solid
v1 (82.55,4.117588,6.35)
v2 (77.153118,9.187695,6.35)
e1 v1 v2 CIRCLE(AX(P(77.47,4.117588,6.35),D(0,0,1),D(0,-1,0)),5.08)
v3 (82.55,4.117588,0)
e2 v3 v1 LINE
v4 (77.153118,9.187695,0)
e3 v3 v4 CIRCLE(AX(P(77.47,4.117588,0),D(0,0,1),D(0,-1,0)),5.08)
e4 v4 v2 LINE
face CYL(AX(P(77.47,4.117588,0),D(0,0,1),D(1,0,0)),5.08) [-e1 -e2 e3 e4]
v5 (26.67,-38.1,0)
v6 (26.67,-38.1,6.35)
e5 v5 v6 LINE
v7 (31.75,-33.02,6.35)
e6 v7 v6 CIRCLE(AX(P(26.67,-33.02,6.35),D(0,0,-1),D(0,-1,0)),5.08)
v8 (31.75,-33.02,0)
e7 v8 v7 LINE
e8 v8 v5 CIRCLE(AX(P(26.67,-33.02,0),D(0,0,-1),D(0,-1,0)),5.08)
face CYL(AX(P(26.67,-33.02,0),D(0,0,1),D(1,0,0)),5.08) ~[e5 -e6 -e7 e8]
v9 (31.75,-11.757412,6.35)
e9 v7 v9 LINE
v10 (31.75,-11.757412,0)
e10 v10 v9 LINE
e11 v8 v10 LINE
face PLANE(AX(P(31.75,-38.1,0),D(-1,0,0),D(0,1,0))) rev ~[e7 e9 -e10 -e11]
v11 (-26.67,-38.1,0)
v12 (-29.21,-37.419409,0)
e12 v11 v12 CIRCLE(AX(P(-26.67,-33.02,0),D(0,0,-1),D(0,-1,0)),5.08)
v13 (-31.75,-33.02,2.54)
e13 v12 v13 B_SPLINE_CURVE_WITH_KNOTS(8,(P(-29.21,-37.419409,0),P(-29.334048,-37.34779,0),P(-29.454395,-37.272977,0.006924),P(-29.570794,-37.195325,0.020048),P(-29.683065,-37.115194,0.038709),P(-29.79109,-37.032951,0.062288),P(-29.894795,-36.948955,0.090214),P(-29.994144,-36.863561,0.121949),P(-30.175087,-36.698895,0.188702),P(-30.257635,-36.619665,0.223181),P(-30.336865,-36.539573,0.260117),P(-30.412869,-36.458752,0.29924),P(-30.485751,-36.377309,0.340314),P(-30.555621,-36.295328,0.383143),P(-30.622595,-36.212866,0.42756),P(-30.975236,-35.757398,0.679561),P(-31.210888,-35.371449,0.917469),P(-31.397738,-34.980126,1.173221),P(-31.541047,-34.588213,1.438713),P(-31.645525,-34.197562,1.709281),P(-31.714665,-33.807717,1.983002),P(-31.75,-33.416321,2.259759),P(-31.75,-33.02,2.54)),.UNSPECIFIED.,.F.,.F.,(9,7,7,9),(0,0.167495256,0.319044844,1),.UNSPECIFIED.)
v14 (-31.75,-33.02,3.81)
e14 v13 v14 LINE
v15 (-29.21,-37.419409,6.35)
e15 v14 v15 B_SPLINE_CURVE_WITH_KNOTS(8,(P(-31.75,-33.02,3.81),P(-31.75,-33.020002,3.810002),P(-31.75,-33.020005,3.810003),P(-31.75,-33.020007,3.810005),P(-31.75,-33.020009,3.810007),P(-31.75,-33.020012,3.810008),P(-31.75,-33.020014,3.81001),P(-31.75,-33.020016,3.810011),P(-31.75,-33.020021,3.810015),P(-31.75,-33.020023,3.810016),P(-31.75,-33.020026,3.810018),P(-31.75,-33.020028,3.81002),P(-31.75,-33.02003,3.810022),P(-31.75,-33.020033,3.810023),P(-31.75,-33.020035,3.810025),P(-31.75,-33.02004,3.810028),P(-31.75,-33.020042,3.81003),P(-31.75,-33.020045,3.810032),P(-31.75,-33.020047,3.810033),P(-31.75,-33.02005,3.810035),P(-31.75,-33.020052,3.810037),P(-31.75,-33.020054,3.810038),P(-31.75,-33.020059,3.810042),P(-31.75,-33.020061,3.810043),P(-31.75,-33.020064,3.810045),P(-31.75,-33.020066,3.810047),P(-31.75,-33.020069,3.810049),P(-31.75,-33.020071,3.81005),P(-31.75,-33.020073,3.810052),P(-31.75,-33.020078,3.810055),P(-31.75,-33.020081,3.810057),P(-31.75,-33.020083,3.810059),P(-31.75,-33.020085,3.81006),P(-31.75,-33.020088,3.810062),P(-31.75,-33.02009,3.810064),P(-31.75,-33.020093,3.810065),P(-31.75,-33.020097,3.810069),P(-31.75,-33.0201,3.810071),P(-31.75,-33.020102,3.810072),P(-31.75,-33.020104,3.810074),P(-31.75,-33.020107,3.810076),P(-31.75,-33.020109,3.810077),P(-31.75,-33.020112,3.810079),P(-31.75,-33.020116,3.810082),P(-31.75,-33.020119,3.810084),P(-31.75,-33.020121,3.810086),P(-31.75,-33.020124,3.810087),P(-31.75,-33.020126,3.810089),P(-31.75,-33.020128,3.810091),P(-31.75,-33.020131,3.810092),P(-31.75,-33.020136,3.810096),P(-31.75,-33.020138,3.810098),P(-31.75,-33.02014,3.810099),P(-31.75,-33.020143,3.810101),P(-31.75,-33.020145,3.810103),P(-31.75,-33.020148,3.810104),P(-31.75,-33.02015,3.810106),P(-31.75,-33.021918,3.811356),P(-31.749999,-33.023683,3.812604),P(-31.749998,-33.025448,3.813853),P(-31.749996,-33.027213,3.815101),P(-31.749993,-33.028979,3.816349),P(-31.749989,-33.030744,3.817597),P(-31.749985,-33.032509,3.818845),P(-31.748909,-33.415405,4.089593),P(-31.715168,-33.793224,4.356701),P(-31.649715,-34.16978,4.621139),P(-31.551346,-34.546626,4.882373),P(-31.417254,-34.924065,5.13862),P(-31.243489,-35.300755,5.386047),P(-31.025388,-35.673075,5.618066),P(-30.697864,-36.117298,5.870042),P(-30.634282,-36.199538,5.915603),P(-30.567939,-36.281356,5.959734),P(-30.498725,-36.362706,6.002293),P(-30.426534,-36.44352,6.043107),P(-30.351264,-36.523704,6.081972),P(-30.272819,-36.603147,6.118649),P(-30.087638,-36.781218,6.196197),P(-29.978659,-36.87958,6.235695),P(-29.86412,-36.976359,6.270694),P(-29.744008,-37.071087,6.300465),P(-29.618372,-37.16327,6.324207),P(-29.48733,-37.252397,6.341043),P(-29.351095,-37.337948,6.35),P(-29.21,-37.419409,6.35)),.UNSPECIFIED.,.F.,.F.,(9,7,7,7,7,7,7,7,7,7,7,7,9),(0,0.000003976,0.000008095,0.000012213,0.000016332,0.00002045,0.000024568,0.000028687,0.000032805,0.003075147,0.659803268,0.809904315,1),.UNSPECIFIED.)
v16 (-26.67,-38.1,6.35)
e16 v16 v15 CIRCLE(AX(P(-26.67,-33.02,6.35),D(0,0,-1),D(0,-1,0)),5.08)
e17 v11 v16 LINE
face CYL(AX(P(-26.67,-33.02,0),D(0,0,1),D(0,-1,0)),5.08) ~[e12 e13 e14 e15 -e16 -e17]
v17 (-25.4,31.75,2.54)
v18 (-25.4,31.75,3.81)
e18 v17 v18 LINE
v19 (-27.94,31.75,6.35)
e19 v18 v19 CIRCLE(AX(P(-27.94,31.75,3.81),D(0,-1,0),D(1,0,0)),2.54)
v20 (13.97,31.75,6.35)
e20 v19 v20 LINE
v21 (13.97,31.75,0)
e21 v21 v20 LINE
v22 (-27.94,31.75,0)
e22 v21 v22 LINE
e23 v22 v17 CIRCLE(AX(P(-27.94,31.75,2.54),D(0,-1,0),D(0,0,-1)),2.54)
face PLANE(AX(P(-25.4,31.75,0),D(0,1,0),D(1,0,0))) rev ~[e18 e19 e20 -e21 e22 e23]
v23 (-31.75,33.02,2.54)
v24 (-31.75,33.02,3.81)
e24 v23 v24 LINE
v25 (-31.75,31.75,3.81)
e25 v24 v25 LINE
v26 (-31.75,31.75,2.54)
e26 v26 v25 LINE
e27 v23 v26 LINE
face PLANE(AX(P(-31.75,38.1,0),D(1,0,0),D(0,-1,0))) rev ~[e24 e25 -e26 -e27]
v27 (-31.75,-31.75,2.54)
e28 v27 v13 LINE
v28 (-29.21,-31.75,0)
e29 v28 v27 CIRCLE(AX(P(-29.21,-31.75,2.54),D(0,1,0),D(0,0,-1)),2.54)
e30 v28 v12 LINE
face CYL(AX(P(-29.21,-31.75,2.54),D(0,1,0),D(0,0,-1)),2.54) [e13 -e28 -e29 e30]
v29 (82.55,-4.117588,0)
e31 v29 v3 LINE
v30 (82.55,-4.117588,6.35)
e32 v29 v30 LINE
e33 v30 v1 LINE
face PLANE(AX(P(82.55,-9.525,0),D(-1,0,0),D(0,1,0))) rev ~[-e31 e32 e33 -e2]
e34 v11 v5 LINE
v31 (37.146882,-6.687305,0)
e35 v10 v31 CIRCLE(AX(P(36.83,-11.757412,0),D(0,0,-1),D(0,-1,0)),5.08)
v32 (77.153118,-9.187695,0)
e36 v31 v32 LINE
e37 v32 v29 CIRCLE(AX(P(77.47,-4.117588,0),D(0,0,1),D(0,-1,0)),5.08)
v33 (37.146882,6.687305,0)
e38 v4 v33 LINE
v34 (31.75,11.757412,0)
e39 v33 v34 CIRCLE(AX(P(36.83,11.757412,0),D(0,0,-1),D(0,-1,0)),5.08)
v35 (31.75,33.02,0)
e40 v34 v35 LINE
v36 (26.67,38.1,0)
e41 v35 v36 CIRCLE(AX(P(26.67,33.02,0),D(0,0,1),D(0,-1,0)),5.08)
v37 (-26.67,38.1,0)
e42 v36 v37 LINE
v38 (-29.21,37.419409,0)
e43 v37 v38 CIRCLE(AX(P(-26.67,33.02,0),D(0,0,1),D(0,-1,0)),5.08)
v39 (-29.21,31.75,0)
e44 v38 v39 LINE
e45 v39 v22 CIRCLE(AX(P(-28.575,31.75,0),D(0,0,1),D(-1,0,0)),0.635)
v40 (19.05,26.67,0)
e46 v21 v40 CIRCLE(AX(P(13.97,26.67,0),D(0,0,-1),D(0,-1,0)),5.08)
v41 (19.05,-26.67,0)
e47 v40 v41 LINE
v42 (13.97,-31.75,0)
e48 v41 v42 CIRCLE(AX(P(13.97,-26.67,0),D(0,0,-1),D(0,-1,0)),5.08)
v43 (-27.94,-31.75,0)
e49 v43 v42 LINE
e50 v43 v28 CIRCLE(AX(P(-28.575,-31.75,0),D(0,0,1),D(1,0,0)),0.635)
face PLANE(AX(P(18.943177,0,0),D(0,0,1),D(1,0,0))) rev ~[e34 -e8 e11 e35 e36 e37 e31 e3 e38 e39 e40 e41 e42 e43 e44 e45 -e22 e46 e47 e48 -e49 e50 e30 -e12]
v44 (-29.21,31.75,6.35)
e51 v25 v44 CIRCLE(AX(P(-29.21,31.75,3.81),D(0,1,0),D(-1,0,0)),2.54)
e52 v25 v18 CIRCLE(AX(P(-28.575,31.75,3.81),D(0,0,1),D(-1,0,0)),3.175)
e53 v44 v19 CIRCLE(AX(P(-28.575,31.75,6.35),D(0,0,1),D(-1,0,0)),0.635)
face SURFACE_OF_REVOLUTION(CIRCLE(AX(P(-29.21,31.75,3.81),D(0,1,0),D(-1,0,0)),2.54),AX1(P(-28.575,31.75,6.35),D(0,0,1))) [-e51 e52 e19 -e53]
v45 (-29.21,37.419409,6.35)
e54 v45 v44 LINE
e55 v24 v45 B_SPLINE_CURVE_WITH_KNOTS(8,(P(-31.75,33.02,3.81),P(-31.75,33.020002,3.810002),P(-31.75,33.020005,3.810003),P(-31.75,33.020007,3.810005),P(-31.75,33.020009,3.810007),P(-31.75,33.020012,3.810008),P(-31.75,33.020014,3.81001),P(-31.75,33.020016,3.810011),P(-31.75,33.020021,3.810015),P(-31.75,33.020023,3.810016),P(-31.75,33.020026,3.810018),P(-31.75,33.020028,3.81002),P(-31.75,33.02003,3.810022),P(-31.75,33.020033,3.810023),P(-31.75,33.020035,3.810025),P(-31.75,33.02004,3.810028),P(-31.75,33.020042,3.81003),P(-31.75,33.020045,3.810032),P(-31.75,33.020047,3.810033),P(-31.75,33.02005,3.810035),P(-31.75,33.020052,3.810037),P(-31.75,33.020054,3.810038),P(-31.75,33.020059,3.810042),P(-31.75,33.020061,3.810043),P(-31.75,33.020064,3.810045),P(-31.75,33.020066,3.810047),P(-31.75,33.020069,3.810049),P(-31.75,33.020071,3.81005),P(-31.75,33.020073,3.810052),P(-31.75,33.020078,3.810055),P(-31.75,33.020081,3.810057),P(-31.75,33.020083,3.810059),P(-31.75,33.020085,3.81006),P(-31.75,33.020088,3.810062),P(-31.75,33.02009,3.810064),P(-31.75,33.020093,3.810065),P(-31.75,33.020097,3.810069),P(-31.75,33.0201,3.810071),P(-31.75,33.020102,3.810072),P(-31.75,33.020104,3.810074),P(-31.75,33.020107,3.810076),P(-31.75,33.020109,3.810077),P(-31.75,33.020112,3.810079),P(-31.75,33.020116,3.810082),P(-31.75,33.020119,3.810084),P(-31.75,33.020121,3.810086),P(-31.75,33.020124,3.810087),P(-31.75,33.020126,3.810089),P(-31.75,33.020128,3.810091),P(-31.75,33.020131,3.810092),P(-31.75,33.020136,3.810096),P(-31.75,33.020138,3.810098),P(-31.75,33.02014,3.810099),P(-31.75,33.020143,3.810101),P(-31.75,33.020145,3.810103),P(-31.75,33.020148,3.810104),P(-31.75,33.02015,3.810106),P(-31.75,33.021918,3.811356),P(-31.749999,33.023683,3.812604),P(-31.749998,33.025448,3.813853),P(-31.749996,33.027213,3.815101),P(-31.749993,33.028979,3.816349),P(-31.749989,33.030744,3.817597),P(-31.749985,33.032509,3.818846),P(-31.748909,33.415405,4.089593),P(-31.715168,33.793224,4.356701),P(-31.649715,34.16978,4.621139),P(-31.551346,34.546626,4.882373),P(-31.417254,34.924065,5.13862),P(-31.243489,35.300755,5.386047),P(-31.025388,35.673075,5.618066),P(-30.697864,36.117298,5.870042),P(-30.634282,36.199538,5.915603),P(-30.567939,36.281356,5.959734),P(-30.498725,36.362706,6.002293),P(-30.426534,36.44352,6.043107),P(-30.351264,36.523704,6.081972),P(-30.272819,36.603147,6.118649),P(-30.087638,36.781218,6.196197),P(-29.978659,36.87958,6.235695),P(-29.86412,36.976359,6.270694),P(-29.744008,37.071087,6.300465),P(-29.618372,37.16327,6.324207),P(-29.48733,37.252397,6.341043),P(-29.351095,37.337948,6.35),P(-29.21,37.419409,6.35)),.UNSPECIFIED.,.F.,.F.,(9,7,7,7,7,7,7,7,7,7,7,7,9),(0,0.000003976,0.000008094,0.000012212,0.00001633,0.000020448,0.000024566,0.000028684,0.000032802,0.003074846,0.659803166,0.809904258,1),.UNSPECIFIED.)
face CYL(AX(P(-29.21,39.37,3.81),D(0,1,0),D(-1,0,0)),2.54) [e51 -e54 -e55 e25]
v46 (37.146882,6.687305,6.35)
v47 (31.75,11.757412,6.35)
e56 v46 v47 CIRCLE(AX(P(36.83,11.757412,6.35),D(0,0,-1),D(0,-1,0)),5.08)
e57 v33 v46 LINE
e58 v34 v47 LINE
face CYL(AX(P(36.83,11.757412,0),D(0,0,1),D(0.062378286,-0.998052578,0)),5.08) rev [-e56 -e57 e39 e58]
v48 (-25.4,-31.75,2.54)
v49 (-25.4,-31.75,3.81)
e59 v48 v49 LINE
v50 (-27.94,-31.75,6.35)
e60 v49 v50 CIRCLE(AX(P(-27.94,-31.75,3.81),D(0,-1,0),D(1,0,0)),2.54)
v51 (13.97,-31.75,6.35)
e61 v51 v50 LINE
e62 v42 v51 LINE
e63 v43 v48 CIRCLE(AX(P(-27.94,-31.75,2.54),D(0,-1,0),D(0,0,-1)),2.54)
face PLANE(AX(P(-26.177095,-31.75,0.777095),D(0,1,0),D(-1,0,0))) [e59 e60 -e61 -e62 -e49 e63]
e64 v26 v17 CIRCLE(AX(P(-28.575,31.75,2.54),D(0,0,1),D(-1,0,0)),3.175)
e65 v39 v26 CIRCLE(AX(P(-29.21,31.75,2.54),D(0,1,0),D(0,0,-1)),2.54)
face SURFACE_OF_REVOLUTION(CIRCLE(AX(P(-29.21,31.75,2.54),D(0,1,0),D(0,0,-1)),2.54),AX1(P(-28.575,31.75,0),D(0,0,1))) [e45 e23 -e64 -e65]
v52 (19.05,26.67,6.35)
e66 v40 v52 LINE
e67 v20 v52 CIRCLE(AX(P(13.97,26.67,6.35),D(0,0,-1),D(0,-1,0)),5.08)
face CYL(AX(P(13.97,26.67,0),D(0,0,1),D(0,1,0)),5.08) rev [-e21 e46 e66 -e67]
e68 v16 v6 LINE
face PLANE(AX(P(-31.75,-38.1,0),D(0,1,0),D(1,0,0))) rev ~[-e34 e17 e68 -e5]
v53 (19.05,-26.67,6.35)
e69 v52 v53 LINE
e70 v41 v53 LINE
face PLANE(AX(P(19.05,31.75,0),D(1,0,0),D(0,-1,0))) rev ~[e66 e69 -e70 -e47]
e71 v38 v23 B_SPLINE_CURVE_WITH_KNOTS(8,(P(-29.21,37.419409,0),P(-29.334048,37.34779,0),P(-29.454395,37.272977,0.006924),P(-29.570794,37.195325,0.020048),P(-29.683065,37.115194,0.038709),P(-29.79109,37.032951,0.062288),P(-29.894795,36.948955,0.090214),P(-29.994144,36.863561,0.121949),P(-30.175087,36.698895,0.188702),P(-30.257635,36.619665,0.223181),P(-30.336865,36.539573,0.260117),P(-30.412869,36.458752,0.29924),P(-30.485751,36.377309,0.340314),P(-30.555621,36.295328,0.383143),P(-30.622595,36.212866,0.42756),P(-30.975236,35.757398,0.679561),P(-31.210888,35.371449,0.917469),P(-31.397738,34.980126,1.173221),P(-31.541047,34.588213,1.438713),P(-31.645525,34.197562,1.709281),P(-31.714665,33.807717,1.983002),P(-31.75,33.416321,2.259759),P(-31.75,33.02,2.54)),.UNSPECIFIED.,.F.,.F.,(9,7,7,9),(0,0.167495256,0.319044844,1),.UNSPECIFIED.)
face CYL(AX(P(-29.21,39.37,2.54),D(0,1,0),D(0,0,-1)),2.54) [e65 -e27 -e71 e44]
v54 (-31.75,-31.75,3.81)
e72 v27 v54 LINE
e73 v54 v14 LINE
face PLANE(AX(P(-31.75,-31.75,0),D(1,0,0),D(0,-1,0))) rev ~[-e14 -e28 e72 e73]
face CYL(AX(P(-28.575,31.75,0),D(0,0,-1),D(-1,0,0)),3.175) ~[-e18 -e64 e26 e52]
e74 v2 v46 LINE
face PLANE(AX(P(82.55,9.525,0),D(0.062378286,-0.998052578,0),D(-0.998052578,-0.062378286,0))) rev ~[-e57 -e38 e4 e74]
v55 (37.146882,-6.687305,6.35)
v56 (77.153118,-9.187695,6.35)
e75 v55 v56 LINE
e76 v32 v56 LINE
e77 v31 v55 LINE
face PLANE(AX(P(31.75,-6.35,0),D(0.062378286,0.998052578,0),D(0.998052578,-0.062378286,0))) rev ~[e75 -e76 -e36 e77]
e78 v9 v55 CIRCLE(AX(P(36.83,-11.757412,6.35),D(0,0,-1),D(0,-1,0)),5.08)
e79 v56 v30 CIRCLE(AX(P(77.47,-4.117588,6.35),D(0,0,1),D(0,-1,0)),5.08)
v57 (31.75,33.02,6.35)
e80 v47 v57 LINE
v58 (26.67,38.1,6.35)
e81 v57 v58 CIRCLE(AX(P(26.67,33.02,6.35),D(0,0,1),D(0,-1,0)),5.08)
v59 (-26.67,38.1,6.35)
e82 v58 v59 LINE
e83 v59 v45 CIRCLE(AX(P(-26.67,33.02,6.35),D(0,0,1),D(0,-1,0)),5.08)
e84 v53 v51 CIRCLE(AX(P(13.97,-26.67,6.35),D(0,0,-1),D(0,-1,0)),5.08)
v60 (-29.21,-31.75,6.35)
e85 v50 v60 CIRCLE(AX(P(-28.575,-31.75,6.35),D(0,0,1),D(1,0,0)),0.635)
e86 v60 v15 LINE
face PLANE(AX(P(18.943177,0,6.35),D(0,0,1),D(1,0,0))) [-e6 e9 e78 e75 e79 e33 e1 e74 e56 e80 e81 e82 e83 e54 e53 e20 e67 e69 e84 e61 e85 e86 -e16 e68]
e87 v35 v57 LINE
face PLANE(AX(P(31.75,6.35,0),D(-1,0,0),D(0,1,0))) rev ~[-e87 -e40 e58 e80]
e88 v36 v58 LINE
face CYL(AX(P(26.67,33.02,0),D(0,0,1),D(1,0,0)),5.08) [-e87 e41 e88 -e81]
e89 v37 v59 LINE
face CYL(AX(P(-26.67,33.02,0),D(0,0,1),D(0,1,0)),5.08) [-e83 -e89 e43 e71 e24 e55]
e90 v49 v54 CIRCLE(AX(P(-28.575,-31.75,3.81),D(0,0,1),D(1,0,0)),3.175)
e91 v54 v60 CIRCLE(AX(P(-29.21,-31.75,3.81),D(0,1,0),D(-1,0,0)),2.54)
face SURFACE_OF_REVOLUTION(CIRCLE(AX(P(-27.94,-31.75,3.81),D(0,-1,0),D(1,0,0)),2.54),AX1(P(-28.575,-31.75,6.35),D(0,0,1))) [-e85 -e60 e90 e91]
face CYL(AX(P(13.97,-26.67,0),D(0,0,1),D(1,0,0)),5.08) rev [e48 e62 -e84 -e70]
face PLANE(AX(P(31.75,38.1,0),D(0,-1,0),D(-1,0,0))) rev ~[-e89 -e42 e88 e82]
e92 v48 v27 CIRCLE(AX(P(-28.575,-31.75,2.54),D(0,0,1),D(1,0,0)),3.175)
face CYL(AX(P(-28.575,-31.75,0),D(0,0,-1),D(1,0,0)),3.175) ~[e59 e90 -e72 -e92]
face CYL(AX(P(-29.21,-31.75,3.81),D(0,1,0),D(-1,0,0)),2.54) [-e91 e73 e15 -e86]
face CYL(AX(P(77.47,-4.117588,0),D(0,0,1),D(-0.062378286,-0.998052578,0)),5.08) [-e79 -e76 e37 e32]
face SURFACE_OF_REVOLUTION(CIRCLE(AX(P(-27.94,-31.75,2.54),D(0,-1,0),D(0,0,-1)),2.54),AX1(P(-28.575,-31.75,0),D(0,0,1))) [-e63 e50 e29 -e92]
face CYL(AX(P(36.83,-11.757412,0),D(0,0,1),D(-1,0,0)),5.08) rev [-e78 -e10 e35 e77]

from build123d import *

# Parameters (mm, degrees)
F1_DEPTH     = 6.35
F2_F1_R      = 5.08
F2_F2_R      = 5.08
F3_T1_DEPTH  = 7.62
F3_T3_DEPTH  = 7.62
F3_T6_ANGLE  = 180
F3_T8_ANGLE  = 180
F3_T10_ANGLE = 180
F3_T12_ANGLE = 180


# Not quite as in the source:
# - a fillet or chamfer that OpenCascade refuses, or shapes differently, is made with other operations: its cross-section is extruded or revolved along the edge and cut away or added


with BuildPart() as f1:
    # F0 (on Top) → F1 (new body)
    with BuildSketch(Plane.XY):
        with BuildLine():
            Line((-31.75, -38.1), (31.75, -38.1))
            Line((31.75, -38.1), (31.75, -6.35))
            Line((31.75, -6.35), (82.55, -9.525))
            Line((82.55, -9.525), (82.55, 9.525))
            Line((82.55, 9.525), (31.75, 6.35))
            Line((31.75, 6.35), (31.75, 38.1))
            Line((31.75, 38.1), (-31.75, 38.1))
            Line((-31.75, 38.1), (-31.75, 31.75))
            ThreePointArc((-31.75, 31.75), (-28.575, 28.575), (-25.4, 31.75))
            Line((-25.4, 31.75), (19.05, 31.75))
            Line((19.05, 31.75), (19.05, -31.75))
            Line((19.05, -31.75), (-25.4, -31.75))
            ThreePointArc((-25.4, -31.75), (-28.575, -28.575), (-31.75, -31.75))
            Line((-31.75, -31.75), (-31.75, -38.1))
        make_face()
    extrude(amount=F1_DEPTH)

    # F2: fillet of radius 5.08 on 10 edges, made by hand

    # F2_f1
    f2_f1_edges = [f1.edges().sort_by_distance(p)[0] for p in [
        (19.05, -31.75, 3.175),
        (31.75, 6.35, 3.175),
        (31.75, -6.35, 3.175),
        (19.05, 31.75, 3.175),
    ]]
    fillet(f2_f1_edges, radius=F2_F1_R)

    # F2_f2
    f2_f2_edges = [f1.edges().sort_by_distance(p)[0] for p in [
        (31.75, -38.1, 3.175),
        (-31.75, -38.1, 3.175),
        (82.55, -9.525, 3.175),
        (82.55, 9.525, 3.175),
        (31.75, 38.1, 3.175),
        (-31.75, 38.1, 3.175),
    ]]
    fillet(f2_f2_edges, radius=F2_F2_R)

    # F3: fillet of radius 2.54 on 8 edges, made by hand

    # F3_s2 → F3_t1 (cut)
    with BuildSketch(Plane.XZ.offset(-39.37)):
        with BuildLine():
            ThreePointArc((-31.75, 3.81), (-31.0060512242, 5.6060512242), (-29.21, 6.35))
            Line((-29.21, 6.35), (-31.75, 6.35))
            Line((-31.75, 6.35), (-31.75, 3.81))
        make_face()
        with BuildLine():
            ThreePointArc((-29.21, 0), (-31.0060512242, 0.7439487758), (-31.75, 2.54))
            Line((-31.75, 2.54), (-31.75, 0))
            Line((-31.75, 0), (-29.21, 0))
        make_face()
    extrude(amount=F3_T1_DEPTH, mode=Mode.SUBTRACT)

    # F3_s4 → F3_t3 (cut)
    with BuildSketch(Plane.XZ.offset(31.75)):
        with BuildLine():
            ThreePointArc((-31.75, 3.81), (-31.0060512242, 5.6060512242), (-29.21, 6.35))
            Line((-29.21, 6.35), (-31.75, 6.35))
            Line((-31.75, 6.35), (-31.75, 3.81))
        make_face()
        with BuildLine():
            ThreePointArc((-29.21, 0), (-31.0060512242, 0.7439487758), (-31.75, 2.54))
            Line((-31.75, 2.54), (-31.75, 0))
            Line((-31.75, 0), (-29.21, 0))
        make_face()
    extrude(amount=F3_T3_DEPTH, mode=Mode.SUBTRACT)

    # F3_s5 → F3_t6 (revolve, cut)
    with BuildSketch(Plane.XZ.offset(-31.75)):
        with BuildLine():
            ThreePointArc((-31.75, 3.81), (-31.0060512242, 5.6060512242), (-29.21, 6.35))
            Line((-29.21, 6.35), (-31.75, 6.35))
            Line((-31.75, 6.35), (-31.75, 3.81))
        make_face()
    revolve(axis=Axis((-28.575, 31.75, 6.35), (0, 0, 1)), revolution_arc=F3_T6_ANGLE, mode=Mode.SUBTRACT)

    # F3_s7 → F3_t8 (revolve, cut)
    with BuildSketch(Plane.XZ.offset(-31.75)):
        with BuildLine():
            ThreePointArc((-29.21, 0), (-31.0060512242, 0.7439487758), (-31.75, 2.54))
            Line((-31.75, 2.54), (-31.75, 0))
            Line((-31.75, 0), (-29.21, 0))
        make_face()
    revolve(axis=Axis((-28.575, 31.75, 0), (0, 0, 1)), revolution_arc=F3_T8_ANGLE, mode=Mode.SUBTRACT)

    # F3_s9 → F3_t10 (revolve, cut)
    with BuildSketch(Plane.XZ.offset(31.75)):
        with BuildLine():
            ThreePointArc((-25.4, 3.81), (-26.1439487758, 5.6060512242), (-27.94, 6.35))
            Line((-27.94, 6.35), (-25.4, 6.35))
            Line((-25.4, 6.35), (-25.4, 3.81))
        make_face()
    revolve(axis=Axis((-28.575, -31.75, 6.35), (0, 0, 1)), revolution_arc=F3_T10_ANGLE, mode=Mode.SUBTRACT)

    # F3_s11 → F3_t12 (revolve, cut)
    with BuildSketch(Plane.XZ.offset(31.75)):
        with BuildLine():
            ThreePointArc((-27.94, 0), (-26.1439487758, 0.7439487758), (-25.4, 2.54))
            Line((-25.4, 2.54), (-25.4, 0))
            Line((-25.4, 0), (-27.94, 0))
        make_face()
    revolve(axis=Axis((-28.575, -31.75, 0), (0, 0, 1)), revolution_arc=F3_T12_ANGLE, mode=Mode.SUBTRACT)


solid = f1.part
